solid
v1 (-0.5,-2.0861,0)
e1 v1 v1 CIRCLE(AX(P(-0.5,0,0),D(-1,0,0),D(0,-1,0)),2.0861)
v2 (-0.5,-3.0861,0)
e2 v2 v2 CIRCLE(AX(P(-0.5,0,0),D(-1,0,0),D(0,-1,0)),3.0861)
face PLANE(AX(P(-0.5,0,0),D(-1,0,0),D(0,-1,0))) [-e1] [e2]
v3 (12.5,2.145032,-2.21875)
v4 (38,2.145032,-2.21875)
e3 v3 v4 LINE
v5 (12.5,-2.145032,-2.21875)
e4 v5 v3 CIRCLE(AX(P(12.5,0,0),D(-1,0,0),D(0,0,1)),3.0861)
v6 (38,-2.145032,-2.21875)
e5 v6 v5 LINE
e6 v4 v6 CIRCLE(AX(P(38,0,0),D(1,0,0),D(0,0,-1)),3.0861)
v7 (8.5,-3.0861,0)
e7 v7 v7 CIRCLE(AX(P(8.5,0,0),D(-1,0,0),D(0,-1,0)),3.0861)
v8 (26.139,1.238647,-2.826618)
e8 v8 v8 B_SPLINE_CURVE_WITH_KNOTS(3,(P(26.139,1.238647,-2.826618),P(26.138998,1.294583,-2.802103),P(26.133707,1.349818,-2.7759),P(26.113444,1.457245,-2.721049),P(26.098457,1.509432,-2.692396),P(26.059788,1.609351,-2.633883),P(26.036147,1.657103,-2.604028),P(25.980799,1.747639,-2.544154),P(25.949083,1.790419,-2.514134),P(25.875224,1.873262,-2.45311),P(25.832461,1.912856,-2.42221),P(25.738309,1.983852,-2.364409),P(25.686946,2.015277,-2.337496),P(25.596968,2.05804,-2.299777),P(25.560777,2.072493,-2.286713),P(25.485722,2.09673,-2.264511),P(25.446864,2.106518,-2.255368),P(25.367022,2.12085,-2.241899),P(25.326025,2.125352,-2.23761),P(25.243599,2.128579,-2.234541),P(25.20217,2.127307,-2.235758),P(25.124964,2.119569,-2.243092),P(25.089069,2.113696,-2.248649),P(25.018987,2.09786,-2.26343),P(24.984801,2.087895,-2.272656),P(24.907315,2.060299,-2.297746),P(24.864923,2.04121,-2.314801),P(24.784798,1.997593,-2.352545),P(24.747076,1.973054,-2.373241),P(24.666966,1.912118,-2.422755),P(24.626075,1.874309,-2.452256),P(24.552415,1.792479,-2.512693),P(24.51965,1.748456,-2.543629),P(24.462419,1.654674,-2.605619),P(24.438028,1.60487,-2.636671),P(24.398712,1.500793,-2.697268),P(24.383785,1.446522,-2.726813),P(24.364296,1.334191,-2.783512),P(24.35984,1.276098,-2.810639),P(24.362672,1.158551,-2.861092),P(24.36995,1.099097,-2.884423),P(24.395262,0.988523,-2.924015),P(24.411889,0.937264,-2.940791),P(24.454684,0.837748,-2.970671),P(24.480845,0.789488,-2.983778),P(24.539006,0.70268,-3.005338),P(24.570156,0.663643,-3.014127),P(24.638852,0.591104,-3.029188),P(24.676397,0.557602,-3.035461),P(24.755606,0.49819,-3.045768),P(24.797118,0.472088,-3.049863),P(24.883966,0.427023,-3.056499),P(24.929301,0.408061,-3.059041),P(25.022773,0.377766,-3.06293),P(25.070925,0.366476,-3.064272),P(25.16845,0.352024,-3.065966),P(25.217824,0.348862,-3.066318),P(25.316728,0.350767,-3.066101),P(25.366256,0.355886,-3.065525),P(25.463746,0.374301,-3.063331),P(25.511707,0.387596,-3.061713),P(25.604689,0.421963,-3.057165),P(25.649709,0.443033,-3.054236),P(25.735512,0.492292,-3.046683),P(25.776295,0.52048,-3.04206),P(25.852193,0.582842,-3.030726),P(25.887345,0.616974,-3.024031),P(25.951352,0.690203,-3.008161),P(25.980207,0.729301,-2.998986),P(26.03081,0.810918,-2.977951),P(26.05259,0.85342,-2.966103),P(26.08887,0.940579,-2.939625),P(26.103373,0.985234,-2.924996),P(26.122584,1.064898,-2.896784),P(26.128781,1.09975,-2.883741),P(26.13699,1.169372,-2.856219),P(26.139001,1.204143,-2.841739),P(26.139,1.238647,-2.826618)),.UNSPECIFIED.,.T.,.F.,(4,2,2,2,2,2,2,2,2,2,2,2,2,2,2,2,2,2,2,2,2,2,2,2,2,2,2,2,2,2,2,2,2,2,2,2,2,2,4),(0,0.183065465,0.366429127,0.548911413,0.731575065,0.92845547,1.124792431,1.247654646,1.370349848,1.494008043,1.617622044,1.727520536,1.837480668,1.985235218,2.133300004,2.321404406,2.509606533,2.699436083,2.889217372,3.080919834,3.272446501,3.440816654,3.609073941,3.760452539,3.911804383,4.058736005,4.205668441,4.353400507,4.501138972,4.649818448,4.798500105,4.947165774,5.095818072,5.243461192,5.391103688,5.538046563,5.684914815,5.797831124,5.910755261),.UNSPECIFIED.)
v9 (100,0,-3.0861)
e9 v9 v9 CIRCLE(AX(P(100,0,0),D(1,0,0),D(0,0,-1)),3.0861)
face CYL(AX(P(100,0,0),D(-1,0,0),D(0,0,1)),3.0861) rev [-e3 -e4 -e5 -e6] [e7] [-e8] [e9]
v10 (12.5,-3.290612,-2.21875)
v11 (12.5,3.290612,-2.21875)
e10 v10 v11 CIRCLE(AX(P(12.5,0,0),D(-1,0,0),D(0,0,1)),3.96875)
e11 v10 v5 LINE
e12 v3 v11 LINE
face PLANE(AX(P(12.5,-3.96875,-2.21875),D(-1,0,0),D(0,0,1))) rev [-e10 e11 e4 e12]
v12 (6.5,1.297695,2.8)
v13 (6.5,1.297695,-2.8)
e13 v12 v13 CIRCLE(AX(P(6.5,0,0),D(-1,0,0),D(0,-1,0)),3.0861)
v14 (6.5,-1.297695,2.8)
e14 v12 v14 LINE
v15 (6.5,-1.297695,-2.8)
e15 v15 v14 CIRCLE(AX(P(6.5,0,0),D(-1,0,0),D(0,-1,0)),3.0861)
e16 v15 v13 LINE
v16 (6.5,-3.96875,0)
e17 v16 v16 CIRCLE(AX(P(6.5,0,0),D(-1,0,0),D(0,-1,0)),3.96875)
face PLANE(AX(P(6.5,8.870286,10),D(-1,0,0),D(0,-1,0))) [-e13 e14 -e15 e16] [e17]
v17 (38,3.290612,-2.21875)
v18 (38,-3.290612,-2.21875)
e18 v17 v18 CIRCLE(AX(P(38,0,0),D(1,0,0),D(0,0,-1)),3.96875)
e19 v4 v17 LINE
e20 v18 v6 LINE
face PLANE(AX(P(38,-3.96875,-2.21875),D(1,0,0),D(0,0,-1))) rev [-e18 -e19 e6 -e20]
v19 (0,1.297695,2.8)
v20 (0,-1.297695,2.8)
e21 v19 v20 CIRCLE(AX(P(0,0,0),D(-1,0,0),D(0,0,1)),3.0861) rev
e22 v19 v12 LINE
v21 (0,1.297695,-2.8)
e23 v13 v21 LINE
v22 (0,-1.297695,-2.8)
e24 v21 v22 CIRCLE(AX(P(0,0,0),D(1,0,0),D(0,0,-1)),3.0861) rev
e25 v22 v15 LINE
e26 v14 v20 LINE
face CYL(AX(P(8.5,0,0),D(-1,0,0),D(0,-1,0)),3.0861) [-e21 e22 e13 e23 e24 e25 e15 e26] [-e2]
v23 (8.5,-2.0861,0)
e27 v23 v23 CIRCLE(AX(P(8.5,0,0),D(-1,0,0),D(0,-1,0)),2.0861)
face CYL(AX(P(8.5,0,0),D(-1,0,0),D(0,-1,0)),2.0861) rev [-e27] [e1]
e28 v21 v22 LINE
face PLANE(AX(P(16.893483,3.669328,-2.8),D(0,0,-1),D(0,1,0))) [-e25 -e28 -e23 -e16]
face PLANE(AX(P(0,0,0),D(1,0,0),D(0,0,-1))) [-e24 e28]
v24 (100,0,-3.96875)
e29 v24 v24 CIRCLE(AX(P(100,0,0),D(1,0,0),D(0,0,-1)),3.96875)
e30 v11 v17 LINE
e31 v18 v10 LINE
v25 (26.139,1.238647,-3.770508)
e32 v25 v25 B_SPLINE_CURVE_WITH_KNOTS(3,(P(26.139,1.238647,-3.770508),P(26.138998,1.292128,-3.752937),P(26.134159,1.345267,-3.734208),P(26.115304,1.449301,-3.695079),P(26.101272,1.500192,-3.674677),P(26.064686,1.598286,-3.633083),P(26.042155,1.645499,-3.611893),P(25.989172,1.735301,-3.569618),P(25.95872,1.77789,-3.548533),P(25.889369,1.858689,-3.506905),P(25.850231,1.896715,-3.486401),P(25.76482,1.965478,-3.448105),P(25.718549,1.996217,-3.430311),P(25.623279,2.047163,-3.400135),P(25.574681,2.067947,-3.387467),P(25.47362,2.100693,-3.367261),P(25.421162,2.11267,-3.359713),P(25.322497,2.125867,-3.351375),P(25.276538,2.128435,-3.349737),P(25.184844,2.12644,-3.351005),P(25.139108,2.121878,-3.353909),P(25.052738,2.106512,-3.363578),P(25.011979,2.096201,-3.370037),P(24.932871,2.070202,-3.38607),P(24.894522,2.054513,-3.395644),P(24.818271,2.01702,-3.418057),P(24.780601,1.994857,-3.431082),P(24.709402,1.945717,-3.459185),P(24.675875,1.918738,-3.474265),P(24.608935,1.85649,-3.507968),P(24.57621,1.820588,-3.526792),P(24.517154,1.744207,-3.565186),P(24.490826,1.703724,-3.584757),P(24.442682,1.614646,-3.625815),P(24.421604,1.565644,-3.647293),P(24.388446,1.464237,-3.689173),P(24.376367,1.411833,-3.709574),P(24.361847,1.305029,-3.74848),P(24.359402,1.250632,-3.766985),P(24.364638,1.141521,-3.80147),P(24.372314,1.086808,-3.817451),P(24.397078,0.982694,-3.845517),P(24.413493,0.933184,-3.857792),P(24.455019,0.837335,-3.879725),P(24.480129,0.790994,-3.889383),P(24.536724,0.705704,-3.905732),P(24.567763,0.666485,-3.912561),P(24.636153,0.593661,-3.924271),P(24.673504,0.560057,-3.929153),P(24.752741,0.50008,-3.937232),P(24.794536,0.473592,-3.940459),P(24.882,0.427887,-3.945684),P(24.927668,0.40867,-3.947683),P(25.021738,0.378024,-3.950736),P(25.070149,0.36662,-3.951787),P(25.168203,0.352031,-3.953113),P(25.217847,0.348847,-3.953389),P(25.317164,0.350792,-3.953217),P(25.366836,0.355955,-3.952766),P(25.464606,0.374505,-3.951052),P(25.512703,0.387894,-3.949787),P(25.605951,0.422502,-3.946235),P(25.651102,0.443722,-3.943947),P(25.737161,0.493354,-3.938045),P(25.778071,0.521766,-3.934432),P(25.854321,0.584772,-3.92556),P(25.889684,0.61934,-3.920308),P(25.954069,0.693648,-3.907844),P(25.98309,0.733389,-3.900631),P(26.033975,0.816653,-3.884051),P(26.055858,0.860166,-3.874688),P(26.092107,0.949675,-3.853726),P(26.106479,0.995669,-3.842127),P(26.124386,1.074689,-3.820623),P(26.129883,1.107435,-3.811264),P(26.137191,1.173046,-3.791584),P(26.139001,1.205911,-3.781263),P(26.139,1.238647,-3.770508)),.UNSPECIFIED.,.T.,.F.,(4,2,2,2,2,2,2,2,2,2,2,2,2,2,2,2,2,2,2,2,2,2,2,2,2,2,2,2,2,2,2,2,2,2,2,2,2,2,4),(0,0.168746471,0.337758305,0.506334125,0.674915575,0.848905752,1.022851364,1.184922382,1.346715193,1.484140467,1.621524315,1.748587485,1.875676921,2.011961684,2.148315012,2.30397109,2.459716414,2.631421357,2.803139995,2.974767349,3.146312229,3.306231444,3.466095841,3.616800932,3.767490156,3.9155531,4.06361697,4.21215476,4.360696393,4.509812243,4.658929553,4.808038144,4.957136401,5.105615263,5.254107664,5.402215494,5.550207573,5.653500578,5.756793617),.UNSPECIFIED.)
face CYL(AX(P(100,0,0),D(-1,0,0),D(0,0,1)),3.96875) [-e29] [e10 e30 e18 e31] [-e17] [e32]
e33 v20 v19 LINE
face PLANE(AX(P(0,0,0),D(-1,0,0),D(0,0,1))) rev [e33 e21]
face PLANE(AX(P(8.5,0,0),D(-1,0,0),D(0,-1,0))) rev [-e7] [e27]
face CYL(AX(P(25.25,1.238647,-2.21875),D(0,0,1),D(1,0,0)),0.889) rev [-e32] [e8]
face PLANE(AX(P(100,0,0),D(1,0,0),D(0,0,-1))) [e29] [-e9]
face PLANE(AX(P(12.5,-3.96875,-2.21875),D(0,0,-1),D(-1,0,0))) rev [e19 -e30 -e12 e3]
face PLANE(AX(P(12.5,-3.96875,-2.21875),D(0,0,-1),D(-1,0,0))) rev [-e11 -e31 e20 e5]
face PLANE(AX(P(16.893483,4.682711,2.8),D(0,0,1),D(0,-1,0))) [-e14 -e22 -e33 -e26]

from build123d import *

# Parameters (mm, degrees)
SKETCH2_R                       = 3.96875
SKETCH2_R_2                     = 3.0861
BODY_DEPTH                      = 100
SCREW_HOLE_FOR_WHEEL_DEPTH      = 101.157386
SCREW_HOLE_FOR_WHEEL_DEPTH_BACK = 101.157386
SKETCH3_R                       = 0.5
NOSE_START                      = 12
SKETCH5_R                       = 3.96875
NOSE_DEPTH                      = 12
CHAMFER1_SIZE                   = 1
SKETCH10_R                      = 2.4
CUT_EXTRUDE3_DEPTH              = 113.140546
CAVITY_FOR_WHEEL_DEPTH          = 101.157386
CAVITY_FOR_WHEEL_DEPTH_BACK     = 101.157386
SKETCH4_W                       = 25.5
SKETCH4_H                       = 13.71875
F_2_56_TAPPED_HOLE2_D           = 1.778
CUT_EXTRUDE5_DEPTH              = 10
CUT_EXTRUDE5_DEPTH_BACK         = 10
SKETCH17_R                      = 1.1303
CUT_EXTRUDE4_DEPTH              = 10
CUT_EXTRUDE4_DEPTH_BACK         = 10
SKETCH16_W                      = 30.682561
SKETCH16_H                      = 17.27639
BOSS_EXTRUDE1_DEPTH             = 7
BOSS_EXTRUDE1_DEPTH_BACK        = 2
SKETCH18_R                      = 3.0861
SKETCH18_R_2                    = 2.0861
SKETCH20_W                      = 2.127384
SKETCH20_H                      = 7.889241
SKETCH20_W_2                    = 2.358385
SKETCH20_H_2                    = 10.122376
CUT_EXTRUDE6_DEPTH              = 6.5


with BuildPart() as part:
    # Sketch2 → Body (new body)
    with BuildSketch(Plane(origin=(0, 0, 0), x_dir=(0, 0, -1), z_dir=(1, 0, 0))):
        Circle(SKETCH2_R)
        Circle(SKETCH2_R_2, mode=Mode.SUBTRACT)
    extrude(amount=BODY_DEPTH)

    # Sketch3 → Screw hole for wheel (cut, two sides: drawn at the far end of the back side and taken through both)
    with BuildSketch(Plane.XY.offset(-SCREW_HOLE_FOR_WHEEL_DEPTH_BACK)):
        with Locations((25.25, 1.238647)):
            Circle(SKETCH3_R)
    extrude(amount=SCREW_HOLE_FOR_WHEEL_DEPTH + SCREW_HOLE_FOR_WHEEL_DEPTH_BACK, mode=Mode.SUBTRACT)

    # Sketch5 → Nose (add)
    with BuildSketch(Plane.ZY.offset(NOSE_START)):
        Circle(SKETCH5_R)
    extrude(amount=-NOSE_DEPTH)

    # Chamfer1
    chamfer1_edges = [part.edges().sort_by_distance(p)[0] for p in [
        (-12, 0, -3.96875),
    ]]
    chamfer(chamfer1_edges, length=CHAMFER1_SIZE)

    # Sketch10 → Cut-Extrude3 (cut, through all)
    with BuildSketch(Plane.ZY.offset(12)):
        Circle(SKETCH10_R)
    extrude(amount=-CUT_EXTRUDE3_DEPTH, mode=Mode.SUBTRACT)

    # Cut-Sweep1: sweep along a curve in space
    with BuildLine() as cut_sweep1_path:
        add(Edge.make_bspline(
            [(-12, 0, -3.96875), (-11.970813, 0.516187, -3.96875), (-11.911788, 1.559824, -3.762105), (-11.823773, 2.878986, -2.87939), (-11.735619, 3.762213, -1.558315), (-11.647502, 4.072044, 0), (-11.559375, 3.762112, 1.558315), (-11.47125, 2.879388, 2.87939), (-11.383125, 1.558315, 3.762105), (-11.295, 0, 4.072073), (-11.206875, -1.558315, 3.762105), (-11.11875, -2.87939, 2.87939), (-11.030625, -3.762105, 1.558315), (-10.9425, -4.072073, 0), (-10.854375, -3.762105, -1.558315), (-10.76625, -2.87939, -2.87939), (-10.678125, -1.558315, -3.762105), (-10.59, 0, -4.072073), (-10.501875, 1.558315, -3.762105), (-10.41375, 2.87939, -2.87939), (-10.325625, 3.762105, -1.558315), (-10.2375, 4.072073, 0), (-10.149375, 3.762105, 1.558315), (-10.06125, 2.87939, 2.87939), (-9.973125, 1.558315, 3.762105), (-9.885, 0, 4.072073), (-9.796875, -1.558315, 3.762105), (-9.70875, -2.87939, 2.87939), (-9.620625, -3.762105, 1.558315), (-9.5325, -4.072073, 0), (-9.444375, -3.762105, -1.558315), (-9.35625, -2.87939, -2.87939), (-9.268125, -1.558315, -3.762105), (-9.18, 0, -4.072073), (-9.091875, 1.558315, -3.762105), (-9.00375, 2.87939, -2.87939), (-8.915625, 3.762105, -1.558315), (-8.8275, 4.072073, 0), (-8.739375, 3.762105, 1.558315), (-8.65125, 2.87939, 2.87939), (-8.563125, 1.558315, 3.762105), (-8.475, 0, 4.072073), (-8.386875, -1.558315, 3.762105), (-8.29875, -2.87939, 2.87939), (-8.210625, -3.762105, 1.558315), (-8.1225, -4.072073, 0), (-8.034375, -3.762105, -1.558315), (-7.94625, -2.87939, -2.87939), (-7.858125, -1.558315, -3.762105), (-7.77, 0, -4.072073), (-7.681875, 1.558315, -3.762105), (-7.59375, 2.87939, -2.87939), (-7.505625, 3.762105, -1.558315), (-7.4175, 4.072073, 0), (-7.329375, 3.762105, 1.558315), (-7.24125, 2.87939, 2.87939), (-7.153125, 1.558315, 3.762105), (-7.065, 0, 4.072073), (-6.976875, -1.558315, 3.762105), (-6.88875, -2.87939, 2.87939), (-6.800625, -3.762105, 1.558315), (-6.7125, -4.072073, 0), (-6.624375, -3.762105, -1.558315), (-6.53625, -2.87939, -2.87939), (-6.448125, -1.558315, -3.762105), (-6.36, 0, -4.072073), (-6.271875, 1.558315, -3.762105), (-6.18375, 2.87939, -2.87939), (-6.095625, 3.762105, -1.558315), (-6.0075, 4.072073, 0), (-5.919375, 3.762105, 1.558315), (-5.83125, 2.87939, 2.87939), (-5.743125, 1.558315, 3.762105), (-5.655, 0, 4.072073), (-5.566875, -1.558315, 3.762105), (-5.47875, -2.87939, 2.87939), (-5.390625, -3.762105, 1.558315), (-5.3025, -4.072073, 0), (-5.214375, -3.762105, -1.558315), (-5.12625, -2.87939, -2.87939), (-5.038125, -1.558315, -3.762105), (-4.95, 0, -4.072073), (-4.861875, 1.558315, -3.762105), (-4.77375, 2.87939, -2.87939), (-4.685625, 3.762105, -1.558315), (-4.5975, 4.072073, 0), (-4.509375, 3.762105, 1.558315), (-4.42125, 2.87939, 2.87939), (-4.333125, 1.558315, 3.762105), (-4.245, 0, 4.072073), (-4.156875, -1.558315, 3.762105), (-4.06875, -2.87939, 2.87939), (-3.980625, -3.762105, 1.558315), (-3.8925, -4.072073, 0), (-3.804375, -3.762105, -1.558315), (-3.71625, -2.87939, -2.87939), (-3.628125, -1.558315, -3.762105), (-3.54, 0, -4.072073), (-3.451875, 1.558315, -3.762105), (-3.36375, 2.87939, -2.87939), (-3.275625, 3.762105, -1.558315), (-3.1875, 4.072073, 0), (-3.099375, 3.762105, 1.558315), (-3.01125, 2.87939, 2.87939), (-2.923125, 1.558315, 3.762105), (-2.835, 0, 4.072073), (-2.746875, -1.558315, 3.762105), (-2.65875, -2.87939, 2.87939), (-2.570625, -3.762105, 1.558315), (-2.4825, -4.072073, 0), (-2.394375, -3.762105, -1.558315), (-2.30625, -2.87939, -2.87939), (-2.218125, -1.558315, -3.762105), (-2.13, 0, -4.072073), (-2.041875, 1.558315, -3.762105), (-1.95375, 2.87939, -2.87939), (-1.865625, 3.762105, -1.558315), (-1.7775, 4.072073, 0), (-1.689375, 3.762105, 1.558315), (-1.60125, 2.87939, 2.87939), (-1.513125, 1.558315, 3.762105), (-1.425, 0, 4.072073), (-1.336875, -1.558315, 3.762105), (-1.24875, -2.87939, 2.87939), (-1.160625, -3.762105, 1.558315), (-1.0725, -4.072073, 0), (-0.984375, -3.762105, -1.558315), (-0.89625, -2.87939, -2.87939), (-0.808125, -1.558315, -3.762105), (-0.72, 0, -4.072073), (-0.631875, 1.558315, -3.762105), (-0.54375, 2.879388, -2.87939), (-0.455625, 3.762112, -1.558315), (-0.367498, 4.072044, 0), (-0.279381, 3.762213, 1.558315), (-0.191227, 2.878986, 2.87939), (-0.103212, 1.559824, 3.762105), (-0.044187, 0.516187, 3.96875), (-0.015, 0, 3.96875)],
            knots=[0, 0, 0, 0, 0.007353, 0.014706, 0.022059, 0.029412, 0.036765, 0.044118, 0.051471, 0.058824, 0.066176, 0.073529, 0.080882, 0.088235, 0.095588, 0.102941, 0.110294, 0.117647, 0.125, 0.132353, 0.139706, 0.147059, 0.154412, 0.161765, 0.169118, 0.176471, 0.183824, 0.191176, 0.198529, 0.205882, 0.213235, 0.220588, 0.227941, 0.235294, 0.242647, 0.25, 0.257353, 0.264706, 0.272059, 0.279412, 0.286765, 0.294118, 0.301471, 0.308824, 0.316176, 0.323529, 0.330882, 0.338235, 0.345588, 0.352941, 0.360294, 0.367647, 0.375, 0.382353, 0.389706, 0.397059, 0.404412, 0.411765, 0.419118, 0.426471, 0.433824, 0.441176, 0.448529, 0.455882, 0.463235, 0.470588, 0.477941, 0.485294, 0.492647, 0.5, 0.507353, 0.514706, 0.522059, 0.529412, 0.536765, 0.544118, 0.551471, 0.558824, 0.566176, 0.573529, 0.580882, 0.588235, 0.595588, 0.602941, 0.610294, 0.617647, 0.625, 0.632353, 0.639706, 0.647059, 0.654412, 0.661765, 0.669118, 0.676471, 0.683824, 0.691176, 0.698529, 0.705882, 0.713235, 0.720588, 0.727941, 0.735294, 0.742647, 0.75, 0.757353, 0.764706, 0.772059, 0.779412, 0.786765, 0.794118, 0.801471, 0.808824, 0.816176, 0.823529, 0.830882, 0.838235, 0.845588, 0.852941, 0.860294, 0.867647, 0.875, 0.882353, 0.889706, 0.897059, 0.904412, 0.911765, 0.919118, 0.926471, 0.933824, 0.941176, 0.948529, 0.955882, 0.963235, 0.970588, 0.977941, 0.985294, 0.992647, 1, 1, 1, 1], degree=3))
    with BuildLine() as cut_sweep1_axis:
        Line((-12, 0, 0), (-0.015, 0, 0))
    # Sketch7 → Cut-Sweep1 (sweep, cut)
    with BuildSketch(Plane.XY):
        Polygon((-12, -3.96875), (-12.09, -3.96875), (-12.53, -3.1), (-12.71, -3.1), (-12.71, -5.224109), (-11.29, -5.224109), (-11.29, -3.1), (-11.47, -3.1), (-11.91, -3.96875), align=None)
    sweep(path=cut_sweep1_path.line, binormal=cut_sweep1_axis.edges()[0], mode=Mode.SUBTRACT)

    # Sketch4 → cavity for wheel (cut, two sides: drawn at the far end of the back side and taken through both)
    with BuildSketch(Plane(origin=(0, 0, 0), x_dir=(1, 0, 0), z_dir=(0, 1, 0)).offset(-CAVITY_FOR_WHEEL_DEPTH_BACK)):
        with Locations((25.25, -4.640625)):
            Rectangle(SKETCH4_W, SKETCH4_H)
    extrude(amount=CAVITY_FOR_WHEEL_DEPTH + CAVITY_FOR_WHEEL_DEPTH_BACK, mode=Mode.SUBTRACT)

    # #2-56 Tapped Hole2 (through all)
    with Locations(Plane.XY.offset(-2.21875)):
        with Locations((25.25, 1.238647)):
            Hole(F_2_56_TAPPED_HOLE2_D / 2)

    # Sketch17 → Cut-Extrude5 (cut, two sides: drawn at the far end of the back side and taken through both)
    with BuildSketch(Plane.XY.offset(-CUT_EXTRUDE5_DEPTH_BACK)):
        with Locations((3, 0)):
            Circle(SKETCH17_R)
    extrude(amount=CUT_EXTRUDE5_DEPTH + CUT_EXTRUDE5_DEPTH_BACK, mode=Mode.SUBTRACT)

    # Sketch16 → Cut-Extrude4 (cut, two sides: drawn at the far end of the back side and taken through both)
    with BuildSketch(Plane.XY.offset(-CUT_EXTRUDE4_DEPTH_BACK)):
        with Locations((-8.84128, 0.232091)):
            Rectangle(SKETCH16_W, SKETCH16_H)
    extrude(amount=CUT_EXTRUDE4_DEPTH + CUT_EXTRUDE4_DEPTH_BACK, mode=Mode.SUBTRACT)

    # Sketch18 → Boss-Extrude1 (add, two sides: drawn at the far end of the back side and taken through both)
    with BuildSketch(Plane.ZY.offset(-6.5).offset(-BOSS_EXTRUDE1_DEPTH_BACK)):
        with Locations(Location((0, 0, 0), (0, 0, 270))):
            Circle(SKETCH18_R)
        with Locations(Location((0, 0, 0), (0, 0, 270))):
            Circle(SKETCH18_R_2, mode=Mode.SUBTRACT)
    extrude(amount=BOSS_EXTRUDE1_DEPTH + BOSS_EXTRUDE1_DEPTH_BACK)

    # Sketch20 → Cut-Extrude6 (cut)
    with BuildSketch(Plane(origin=(0, 0, 0), x_dir=(0, 0, -1), z_dir=(1, 0, 0))):
        with Locations((3.863692, -0.275293)):
            Rectangle(SKETCH20_W, SKETCH20_H)
        with Locations((-3.979192, -0.378477)):
            Rectangle(SKETCH20_W_2, SKETCH20_H_2)
    extrude(amount=CUT_EXTRUDE6_DEPTH, mode=Mode.SUBTRACT)


solid = part.part
